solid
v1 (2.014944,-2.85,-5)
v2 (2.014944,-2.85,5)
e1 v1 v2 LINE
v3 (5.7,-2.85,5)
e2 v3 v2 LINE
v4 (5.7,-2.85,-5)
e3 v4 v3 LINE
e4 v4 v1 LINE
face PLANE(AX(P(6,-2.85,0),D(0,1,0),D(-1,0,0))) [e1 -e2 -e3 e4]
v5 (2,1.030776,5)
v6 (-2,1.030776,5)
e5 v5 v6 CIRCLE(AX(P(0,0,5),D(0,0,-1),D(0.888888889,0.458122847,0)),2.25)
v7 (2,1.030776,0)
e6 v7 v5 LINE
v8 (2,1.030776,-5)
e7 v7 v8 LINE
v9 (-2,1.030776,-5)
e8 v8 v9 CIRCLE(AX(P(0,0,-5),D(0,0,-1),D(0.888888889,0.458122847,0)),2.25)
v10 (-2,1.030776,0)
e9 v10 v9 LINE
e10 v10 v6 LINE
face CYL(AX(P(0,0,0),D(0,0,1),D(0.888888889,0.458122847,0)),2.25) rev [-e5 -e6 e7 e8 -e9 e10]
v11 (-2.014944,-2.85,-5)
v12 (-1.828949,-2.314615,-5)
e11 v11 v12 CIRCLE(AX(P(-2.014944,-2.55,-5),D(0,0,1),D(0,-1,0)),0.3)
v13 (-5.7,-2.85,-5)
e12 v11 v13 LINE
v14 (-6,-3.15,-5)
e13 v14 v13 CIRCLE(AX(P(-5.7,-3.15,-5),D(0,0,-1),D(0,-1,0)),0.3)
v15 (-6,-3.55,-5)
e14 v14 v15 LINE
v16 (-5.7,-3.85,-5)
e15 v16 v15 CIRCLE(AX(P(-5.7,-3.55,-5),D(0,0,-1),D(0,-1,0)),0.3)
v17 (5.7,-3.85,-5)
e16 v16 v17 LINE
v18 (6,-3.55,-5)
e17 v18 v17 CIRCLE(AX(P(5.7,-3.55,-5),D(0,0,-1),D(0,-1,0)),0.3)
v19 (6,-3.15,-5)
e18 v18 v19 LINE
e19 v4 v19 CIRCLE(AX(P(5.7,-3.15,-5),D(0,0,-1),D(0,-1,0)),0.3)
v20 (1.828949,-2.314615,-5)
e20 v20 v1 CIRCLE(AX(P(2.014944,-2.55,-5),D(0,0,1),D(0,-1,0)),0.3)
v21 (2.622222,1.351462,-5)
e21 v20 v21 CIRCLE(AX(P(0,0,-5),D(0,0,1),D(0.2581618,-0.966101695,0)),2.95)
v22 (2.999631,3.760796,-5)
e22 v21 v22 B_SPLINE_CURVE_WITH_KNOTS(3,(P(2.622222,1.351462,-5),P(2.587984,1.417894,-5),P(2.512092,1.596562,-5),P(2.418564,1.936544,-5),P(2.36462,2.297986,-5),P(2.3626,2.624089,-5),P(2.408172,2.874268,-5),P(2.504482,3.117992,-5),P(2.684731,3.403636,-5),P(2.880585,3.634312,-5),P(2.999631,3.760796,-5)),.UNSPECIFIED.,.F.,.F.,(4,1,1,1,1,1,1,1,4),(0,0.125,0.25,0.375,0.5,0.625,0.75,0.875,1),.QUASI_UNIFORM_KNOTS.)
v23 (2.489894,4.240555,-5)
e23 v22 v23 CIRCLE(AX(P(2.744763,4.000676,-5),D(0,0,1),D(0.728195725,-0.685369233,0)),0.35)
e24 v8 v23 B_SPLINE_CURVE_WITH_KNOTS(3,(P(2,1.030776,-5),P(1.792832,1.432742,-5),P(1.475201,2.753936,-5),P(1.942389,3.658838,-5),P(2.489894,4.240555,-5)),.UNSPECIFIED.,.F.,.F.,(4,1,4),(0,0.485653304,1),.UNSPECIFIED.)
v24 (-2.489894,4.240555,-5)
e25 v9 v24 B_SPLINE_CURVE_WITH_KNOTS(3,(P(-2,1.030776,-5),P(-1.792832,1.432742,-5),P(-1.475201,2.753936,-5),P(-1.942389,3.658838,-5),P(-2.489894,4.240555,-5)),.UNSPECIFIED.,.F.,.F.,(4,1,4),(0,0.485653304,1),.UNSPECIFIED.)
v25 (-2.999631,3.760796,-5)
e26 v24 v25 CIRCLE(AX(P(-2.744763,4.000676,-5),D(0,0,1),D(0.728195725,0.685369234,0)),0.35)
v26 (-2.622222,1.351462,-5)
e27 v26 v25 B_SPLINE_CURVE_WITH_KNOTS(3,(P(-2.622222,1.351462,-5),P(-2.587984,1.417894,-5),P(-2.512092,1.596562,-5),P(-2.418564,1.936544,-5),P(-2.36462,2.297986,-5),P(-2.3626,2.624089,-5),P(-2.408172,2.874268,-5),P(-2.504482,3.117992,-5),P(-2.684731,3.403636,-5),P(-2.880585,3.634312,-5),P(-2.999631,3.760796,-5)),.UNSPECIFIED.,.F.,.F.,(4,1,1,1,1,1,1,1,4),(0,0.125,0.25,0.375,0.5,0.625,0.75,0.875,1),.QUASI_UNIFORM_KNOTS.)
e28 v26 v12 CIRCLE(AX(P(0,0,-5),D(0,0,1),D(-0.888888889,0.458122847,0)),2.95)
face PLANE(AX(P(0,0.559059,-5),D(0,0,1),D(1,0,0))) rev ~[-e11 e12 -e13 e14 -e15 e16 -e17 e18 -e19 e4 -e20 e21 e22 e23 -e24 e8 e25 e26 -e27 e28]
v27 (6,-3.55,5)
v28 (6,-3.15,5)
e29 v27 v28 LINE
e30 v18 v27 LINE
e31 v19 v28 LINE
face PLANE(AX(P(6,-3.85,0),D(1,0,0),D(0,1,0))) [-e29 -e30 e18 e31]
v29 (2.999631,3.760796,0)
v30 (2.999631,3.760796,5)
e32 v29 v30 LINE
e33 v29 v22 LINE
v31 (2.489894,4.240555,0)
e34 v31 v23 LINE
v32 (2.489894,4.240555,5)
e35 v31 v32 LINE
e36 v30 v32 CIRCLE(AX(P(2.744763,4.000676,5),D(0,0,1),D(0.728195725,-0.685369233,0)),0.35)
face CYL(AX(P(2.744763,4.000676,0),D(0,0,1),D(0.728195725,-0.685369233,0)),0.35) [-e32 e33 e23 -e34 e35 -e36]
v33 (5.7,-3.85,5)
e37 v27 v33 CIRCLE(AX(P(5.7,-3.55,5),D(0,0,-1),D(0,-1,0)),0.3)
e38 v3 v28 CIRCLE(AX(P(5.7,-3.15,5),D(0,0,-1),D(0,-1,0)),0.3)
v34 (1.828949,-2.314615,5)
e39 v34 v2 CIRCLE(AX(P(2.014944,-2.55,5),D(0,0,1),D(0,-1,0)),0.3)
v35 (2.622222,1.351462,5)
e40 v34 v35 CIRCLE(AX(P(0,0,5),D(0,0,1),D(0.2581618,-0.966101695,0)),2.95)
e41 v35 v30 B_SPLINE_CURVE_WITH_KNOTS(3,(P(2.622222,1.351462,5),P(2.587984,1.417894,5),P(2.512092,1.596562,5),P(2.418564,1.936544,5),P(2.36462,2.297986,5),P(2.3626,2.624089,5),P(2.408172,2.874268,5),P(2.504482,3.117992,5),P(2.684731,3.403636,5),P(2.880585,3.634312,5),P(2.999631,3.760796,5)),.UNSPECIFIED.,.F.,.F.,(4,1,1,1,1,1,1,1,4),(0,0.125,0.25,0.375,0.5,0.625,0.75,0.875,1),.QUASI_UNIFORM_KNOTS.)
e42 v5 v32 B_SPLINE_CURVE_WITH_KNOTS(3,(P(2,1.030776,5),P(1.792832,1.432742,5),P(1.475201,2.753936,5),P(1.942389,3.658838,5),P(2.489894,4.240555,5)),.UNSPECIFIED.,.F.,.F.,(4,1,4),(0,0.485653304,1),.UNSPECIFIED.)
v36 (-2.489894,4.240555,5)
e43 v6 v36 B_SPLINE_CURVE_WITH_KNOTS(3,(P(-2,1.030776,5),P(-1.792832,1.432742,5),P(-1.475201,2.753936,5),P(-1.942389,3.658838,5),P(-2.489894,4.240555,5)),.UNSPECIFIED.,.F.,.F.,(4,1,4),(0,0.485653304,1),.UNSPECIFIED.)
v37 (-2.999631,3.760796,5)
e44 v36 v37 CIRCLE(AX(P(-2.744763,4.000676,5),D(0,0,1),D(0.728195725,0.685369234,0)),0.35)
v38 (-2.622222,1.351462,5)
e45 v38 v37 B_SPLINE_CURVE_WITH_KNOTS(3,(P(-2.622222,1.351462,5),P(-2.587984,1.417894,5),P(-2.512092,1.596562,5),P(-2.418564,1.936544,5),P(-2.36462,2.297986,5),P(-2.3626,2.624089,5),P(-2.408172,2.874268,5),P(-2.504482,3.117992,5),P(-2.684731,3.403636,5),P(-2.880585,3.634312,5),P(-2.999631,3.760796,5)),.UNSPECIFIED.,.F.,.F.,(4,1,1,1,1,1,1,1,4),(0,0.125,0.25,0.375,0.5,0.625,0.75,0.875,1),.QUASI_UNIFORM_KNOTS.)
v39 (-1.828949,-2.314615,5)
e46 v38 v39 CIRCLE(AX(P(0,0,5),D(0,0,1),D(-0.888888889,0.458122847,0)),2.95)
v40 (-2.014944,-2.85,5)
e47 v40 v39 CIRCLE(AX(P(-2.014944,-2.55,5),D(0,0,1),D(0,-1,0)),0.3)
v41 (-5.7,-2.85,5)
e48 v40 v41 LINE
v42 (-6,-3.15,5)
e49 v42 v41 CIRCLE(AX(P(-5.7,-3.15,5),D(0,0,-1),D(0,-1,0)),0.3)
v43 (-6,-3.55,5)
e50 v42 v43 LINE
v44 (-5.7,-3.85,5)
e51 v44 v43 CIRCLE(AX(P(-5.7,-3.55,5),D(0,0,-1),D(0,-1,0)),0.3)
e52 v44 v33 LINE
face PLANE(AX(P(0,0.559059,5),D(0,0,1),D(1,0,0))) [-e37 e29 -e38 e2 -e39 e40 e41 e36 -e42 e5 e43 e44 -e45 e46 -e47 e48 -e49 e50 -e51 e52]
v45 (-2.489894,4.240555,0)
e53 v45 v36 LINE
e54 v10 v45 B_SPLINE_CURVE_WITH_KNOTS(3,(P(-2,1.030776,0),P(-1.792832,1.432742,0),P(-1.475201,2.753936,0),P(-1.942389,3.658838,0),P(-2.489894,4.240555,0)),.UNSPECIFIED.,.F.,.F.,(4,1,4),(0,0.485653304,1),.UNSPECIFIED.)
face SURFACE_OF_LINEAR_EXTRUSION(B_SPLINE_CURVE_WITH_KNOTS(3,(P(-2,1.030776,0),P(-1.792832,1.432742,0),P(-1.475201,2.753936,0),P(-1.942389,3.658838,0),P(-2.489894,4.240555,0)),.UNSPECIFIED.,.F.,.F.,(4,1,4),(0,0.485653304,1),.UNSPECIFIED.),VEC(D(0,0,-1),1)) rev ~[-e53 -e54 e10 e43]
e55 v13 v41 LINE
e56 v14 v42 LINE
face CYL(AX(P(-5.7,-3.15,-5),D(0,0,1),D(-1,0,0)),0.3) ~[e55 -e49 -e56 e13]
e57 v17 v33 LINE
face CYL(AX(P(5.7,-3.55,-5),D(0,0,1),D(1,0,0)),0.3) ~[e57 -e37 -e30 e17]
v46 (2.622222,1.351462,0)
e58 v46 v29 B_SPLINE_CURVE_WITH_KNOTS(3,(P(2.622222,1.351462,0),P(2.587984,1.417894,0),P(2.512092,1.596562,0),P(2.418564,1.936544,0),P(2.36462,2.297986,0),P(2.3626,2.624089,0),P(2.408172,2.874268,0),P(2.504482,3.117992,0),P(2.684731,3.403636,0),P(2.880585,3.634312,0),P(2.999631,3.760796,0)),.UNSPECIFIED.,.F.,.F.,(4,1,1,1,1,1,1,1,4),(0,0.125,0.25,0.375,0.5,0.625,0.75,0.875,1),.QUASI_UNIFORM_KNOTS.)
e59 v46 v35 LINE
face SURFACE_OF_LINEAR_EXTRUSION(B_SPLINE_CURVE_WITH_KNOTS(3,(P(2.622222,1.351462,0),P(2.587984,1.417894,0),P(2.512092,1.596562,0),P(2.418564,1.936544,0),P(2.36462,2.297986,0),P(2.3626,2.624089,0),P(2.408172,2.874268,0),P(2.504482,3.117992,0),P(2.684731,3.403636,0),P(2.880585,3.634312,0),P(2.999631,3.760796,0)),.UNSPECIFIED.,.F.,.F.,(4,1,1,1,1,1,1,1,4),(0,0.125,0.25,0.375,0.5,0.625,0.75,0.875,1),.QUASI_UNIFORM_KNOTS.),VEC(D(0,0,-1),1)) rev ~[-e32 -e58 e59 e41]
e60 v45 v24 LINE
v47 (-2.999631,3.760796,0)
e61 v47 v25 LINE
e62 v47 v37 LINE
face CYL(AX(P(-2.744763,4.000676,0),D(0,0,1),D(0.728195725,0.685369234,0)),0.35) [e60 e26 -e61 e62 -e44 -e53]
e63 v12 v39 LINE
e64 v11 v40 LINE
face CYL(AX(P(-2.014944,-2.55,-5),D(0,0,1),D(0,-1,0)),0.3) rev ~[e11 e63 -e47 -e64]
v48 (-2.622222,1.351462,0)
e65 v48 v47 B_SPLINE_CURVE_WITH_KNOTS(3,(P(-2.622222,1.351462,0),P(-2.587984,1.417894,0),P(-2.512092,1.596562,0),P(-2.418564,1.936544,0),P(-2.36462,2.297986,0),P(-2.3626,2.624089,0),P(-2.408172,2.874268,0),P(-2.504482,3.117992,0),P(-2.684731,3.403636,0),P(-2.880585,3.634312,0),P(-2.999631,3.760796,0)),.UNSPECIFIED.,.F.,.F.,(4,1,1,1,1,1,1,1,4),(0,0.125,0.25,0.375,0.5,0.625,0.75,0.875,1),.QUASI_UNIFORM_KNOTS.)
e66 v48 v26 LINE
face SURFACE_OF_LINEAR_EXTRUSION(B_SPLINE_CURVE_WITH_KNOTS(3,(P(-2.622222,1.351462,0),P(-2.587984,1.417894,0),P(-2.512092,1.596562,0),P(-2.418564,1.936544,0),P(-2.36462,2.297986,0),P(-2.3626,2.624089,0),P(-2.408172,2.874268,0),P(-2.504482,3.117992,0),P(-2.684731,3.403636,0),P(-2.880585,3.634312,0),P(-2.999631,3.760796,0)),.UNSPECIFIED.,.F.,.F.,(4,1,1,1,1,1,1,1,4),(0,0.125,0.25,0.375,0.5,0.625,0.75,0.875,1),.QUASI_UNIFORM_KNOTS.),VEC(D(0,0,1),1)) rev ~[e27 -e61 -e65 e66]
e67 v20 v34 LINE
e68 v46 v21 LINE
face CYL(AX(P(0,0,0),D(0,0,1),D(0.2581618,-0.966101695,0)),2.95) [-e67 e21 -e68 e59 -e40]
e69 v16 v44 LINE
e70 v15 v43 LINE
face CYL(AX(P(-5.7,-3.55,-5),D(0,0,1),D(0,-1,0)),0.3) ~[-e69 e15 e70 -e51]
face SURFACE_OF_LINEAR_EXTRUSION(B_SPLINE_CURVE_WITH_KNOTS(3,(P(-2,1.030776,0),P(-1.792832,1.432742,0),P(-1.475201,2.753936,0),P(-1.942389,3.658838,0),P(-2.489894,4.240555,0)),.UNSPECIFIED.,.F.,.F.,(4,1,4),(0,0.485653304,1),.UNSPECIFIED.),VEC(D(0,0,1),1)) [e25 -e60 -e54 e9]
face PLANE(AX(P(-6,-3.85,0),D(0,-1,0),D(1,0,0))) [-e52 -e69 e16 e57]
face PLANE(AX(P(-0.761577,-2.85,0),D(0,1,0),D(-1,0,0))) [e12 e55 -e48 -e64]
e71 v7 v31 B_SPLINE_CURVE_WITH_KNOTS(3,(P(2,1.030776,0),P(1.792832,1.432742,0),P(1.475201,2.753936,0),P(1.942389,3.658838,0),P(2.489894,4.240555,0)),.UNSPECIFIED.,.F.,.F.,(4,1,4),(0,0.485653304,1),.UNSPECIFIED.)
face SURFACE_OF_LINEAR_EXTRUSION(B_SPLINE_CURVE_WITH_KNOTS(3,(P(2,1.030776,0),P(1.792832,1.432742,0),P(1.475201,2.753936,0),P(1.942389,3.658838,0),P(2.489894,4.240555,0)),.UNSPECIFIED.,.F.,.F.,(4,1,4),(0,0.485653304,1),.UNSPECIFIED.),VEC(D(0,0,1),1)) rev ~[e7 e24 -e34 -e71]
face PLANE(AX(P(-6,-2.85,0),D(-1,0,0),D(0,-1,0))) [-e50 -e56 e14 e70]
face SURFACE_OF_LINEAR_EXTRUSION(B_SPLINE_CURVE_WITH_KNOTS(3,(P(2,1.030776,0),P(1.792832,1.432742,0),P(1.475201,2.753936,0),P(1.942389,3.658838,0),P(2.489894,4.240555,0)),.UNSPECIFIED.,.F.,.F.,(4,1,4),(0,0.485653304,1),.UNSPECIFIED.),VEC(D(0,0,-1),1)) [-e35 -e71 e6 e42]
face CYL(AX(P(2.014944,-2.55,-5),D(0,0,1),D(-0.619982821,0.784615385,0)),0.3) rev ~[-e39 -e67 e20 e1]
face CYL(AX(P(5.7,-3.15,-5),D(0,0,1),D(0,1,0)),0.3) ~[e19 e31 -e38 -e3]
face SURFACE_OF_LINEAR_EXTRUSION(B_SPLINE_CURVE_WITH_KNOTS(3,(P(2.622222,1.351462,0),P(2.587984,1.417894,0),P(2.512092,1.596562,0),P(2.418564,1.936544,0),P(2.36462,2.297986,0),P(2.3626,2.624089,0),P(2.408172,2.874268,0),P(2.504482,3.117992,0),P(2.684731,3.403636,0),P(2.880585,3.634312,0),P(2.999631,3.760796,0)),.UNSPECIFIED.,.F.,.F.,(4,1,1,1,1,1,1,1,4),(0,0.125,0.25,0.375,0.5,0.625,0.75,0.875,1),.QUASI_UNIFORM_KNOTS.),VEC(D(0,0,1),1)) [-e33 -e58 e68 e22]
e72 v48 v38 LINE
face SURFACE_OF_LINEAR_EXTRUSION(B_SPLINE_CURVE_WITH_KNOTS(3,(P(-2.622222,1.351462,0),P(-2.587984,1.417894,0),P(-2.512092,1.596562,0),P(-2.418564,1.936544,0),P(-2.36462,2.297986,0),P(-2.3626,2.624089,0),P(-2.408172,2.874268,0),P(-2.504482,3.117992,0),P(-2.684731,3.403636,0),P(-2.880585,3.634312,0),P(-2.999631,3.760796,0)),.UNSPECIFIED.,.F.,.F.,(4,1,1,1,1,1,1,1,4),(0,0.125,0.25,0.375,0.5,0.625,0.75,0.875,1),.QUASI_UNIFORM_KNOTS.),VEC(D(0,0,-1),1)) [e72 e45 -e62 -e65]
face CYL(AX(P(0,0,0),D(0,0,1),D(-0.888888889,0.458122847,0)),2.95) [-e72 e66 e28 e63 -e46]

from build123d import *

# Parameters (mm, degrees)
F1_DEPTH = 5
F2_R     = 0.3


with BuildPart() as f1:
    # F0 (on Top) → F1 (new body, symmetric)
    with BuildSketch(Plane.XY):
        with BuildLine():
            ThreePointArc((2, 1.0307764064), (0, -2.25), (-2, 1.0307764064))
            add(Edge.make_bspline(
                [(-2, 1.0307764064), (-1.7928318797, 1.4327416027), (-1.4752005994, 2.7539357485), (-1.94238935, 3.6588384503), (-2.4898940219, 4.2405549061)],
                knots=[0, 0, 0, 0, 0.4856533037, 1, 1, 1, 1], degree=3))
            ThreePointArc((-2.4898940219, 4.2405549061), (-2.9846417573, 4.255544178), (-2.9996310293, 3.7607964426))
            add(Edge.make_bspline(
                [(-2.6222222222, 1.3514623995), (-2.5879840781, 1.4178941569), (-2.5120919735, 1.5965615902), (-2.4185643331, 1.9365442889), (-2.3646202091, 2.2979855215), (-2.3625995138, 2.6240888033), (-2.4081716924, 2.8742683693), (-2.5044815542, 3.1179920879), (-2.6847308977, 3.4036360851), (-2.8805852991, 3.6343119324), (-2.9996310293, 3.7607964426)],
                knots=[0, 0, 0, 0, 0.125, 0.25, 0.375, 0.5, 0.625, 0.75, 0.875, 1, 1, 1, 1], degree=3))
            ThreePointArc((-2.6222222222, 1.3514623995), (-2.6973313466, -1.1945307057), (-0.7615773106, -2.85))
            Line((-0.7615773106, -2.85), (0.7615773106, -2.85))
            ThreePointArc((0.7615773106, -2.85), (2.6973313466, -1.1945307057), (2.6222222222, 1.3514623995))
            add(Edge.make_bspline(
                [(2.6222222222, 1.3514623995), (2.5879840781, 1.4178941569), (2.5120919735, 1.5965615902), (2.4185643331, 1.9365442889), (2.3646202091, 2.2979855215), (2.3625995138, 2.6240888033), (2.4081716924, 2.8742683693), (2.5044815542, 3.1179920879), (2.6847308977, 3.4036360851), (2.8805852991, 3.6343119324), (2.9996310293, 3.7607964426)],
                knots=[0, 0, 0, 0, 0.125, 0.25, 0.375, 0.5, 0.625, 0.75, 0.875, 1, 1, 1, 1], degree=3))
            ThreePointArc((2.9996310293, 3.7607964426), (2.9846417573, 4.255544178), (2.4898940219, 4.2405549061))
            add(Edge.make_bspline(
                [(2, 1.0307764064), (1.7928318797, 1.4327416027), (1.4752005994, 2.7539357485), (1.94238935, 3.6588384503), (2.4898940219, 4.2405549061)],
                knots=[0, 0, 0, 0, 0.4856533037, 1, 1, 1, 1], degree=3))
        make_face()
        with BuildLine():
            ThreePointArc((0.7615773106, -2.85), (0, -2.95), (-0.7615773106, -2.85))
            Line((-0.7615773106, -2.85), (-6, -2.85))
            Line((-6, -2.85), (-6, -3.85))
            Line((-6, -3.85), (6, -3.85))
            Line((6, -3.85), (6, -2.85))
            Line((6, -2.85), (0.7615773106, -2.85))
        make_face()
        with BuildLine():
            Line((0.7615773106, -2.85), (-0.7615773106, -2.85))
            ThreePointArc((-0.7615773106, -2.85), (0, -2.95), (0.7615773106, -2.85))
        make_face()
    extrude(amount=F1_DEPTH, both=True)

    # F2
    f2_edges = [f1.edges().sort_by_distance(p)[0] for p in [
        (-6, -2.85, 0),
        (-6, -3.85, 0),
        (6, -2.85, 0),
        (6, -3.85, 0),
        (0.761577, -2.85, 0),
        (-0.761577, -2.85, 0),
    ]]
    fillet(f2_edges, radius=F2_R)


solid = f1.part
